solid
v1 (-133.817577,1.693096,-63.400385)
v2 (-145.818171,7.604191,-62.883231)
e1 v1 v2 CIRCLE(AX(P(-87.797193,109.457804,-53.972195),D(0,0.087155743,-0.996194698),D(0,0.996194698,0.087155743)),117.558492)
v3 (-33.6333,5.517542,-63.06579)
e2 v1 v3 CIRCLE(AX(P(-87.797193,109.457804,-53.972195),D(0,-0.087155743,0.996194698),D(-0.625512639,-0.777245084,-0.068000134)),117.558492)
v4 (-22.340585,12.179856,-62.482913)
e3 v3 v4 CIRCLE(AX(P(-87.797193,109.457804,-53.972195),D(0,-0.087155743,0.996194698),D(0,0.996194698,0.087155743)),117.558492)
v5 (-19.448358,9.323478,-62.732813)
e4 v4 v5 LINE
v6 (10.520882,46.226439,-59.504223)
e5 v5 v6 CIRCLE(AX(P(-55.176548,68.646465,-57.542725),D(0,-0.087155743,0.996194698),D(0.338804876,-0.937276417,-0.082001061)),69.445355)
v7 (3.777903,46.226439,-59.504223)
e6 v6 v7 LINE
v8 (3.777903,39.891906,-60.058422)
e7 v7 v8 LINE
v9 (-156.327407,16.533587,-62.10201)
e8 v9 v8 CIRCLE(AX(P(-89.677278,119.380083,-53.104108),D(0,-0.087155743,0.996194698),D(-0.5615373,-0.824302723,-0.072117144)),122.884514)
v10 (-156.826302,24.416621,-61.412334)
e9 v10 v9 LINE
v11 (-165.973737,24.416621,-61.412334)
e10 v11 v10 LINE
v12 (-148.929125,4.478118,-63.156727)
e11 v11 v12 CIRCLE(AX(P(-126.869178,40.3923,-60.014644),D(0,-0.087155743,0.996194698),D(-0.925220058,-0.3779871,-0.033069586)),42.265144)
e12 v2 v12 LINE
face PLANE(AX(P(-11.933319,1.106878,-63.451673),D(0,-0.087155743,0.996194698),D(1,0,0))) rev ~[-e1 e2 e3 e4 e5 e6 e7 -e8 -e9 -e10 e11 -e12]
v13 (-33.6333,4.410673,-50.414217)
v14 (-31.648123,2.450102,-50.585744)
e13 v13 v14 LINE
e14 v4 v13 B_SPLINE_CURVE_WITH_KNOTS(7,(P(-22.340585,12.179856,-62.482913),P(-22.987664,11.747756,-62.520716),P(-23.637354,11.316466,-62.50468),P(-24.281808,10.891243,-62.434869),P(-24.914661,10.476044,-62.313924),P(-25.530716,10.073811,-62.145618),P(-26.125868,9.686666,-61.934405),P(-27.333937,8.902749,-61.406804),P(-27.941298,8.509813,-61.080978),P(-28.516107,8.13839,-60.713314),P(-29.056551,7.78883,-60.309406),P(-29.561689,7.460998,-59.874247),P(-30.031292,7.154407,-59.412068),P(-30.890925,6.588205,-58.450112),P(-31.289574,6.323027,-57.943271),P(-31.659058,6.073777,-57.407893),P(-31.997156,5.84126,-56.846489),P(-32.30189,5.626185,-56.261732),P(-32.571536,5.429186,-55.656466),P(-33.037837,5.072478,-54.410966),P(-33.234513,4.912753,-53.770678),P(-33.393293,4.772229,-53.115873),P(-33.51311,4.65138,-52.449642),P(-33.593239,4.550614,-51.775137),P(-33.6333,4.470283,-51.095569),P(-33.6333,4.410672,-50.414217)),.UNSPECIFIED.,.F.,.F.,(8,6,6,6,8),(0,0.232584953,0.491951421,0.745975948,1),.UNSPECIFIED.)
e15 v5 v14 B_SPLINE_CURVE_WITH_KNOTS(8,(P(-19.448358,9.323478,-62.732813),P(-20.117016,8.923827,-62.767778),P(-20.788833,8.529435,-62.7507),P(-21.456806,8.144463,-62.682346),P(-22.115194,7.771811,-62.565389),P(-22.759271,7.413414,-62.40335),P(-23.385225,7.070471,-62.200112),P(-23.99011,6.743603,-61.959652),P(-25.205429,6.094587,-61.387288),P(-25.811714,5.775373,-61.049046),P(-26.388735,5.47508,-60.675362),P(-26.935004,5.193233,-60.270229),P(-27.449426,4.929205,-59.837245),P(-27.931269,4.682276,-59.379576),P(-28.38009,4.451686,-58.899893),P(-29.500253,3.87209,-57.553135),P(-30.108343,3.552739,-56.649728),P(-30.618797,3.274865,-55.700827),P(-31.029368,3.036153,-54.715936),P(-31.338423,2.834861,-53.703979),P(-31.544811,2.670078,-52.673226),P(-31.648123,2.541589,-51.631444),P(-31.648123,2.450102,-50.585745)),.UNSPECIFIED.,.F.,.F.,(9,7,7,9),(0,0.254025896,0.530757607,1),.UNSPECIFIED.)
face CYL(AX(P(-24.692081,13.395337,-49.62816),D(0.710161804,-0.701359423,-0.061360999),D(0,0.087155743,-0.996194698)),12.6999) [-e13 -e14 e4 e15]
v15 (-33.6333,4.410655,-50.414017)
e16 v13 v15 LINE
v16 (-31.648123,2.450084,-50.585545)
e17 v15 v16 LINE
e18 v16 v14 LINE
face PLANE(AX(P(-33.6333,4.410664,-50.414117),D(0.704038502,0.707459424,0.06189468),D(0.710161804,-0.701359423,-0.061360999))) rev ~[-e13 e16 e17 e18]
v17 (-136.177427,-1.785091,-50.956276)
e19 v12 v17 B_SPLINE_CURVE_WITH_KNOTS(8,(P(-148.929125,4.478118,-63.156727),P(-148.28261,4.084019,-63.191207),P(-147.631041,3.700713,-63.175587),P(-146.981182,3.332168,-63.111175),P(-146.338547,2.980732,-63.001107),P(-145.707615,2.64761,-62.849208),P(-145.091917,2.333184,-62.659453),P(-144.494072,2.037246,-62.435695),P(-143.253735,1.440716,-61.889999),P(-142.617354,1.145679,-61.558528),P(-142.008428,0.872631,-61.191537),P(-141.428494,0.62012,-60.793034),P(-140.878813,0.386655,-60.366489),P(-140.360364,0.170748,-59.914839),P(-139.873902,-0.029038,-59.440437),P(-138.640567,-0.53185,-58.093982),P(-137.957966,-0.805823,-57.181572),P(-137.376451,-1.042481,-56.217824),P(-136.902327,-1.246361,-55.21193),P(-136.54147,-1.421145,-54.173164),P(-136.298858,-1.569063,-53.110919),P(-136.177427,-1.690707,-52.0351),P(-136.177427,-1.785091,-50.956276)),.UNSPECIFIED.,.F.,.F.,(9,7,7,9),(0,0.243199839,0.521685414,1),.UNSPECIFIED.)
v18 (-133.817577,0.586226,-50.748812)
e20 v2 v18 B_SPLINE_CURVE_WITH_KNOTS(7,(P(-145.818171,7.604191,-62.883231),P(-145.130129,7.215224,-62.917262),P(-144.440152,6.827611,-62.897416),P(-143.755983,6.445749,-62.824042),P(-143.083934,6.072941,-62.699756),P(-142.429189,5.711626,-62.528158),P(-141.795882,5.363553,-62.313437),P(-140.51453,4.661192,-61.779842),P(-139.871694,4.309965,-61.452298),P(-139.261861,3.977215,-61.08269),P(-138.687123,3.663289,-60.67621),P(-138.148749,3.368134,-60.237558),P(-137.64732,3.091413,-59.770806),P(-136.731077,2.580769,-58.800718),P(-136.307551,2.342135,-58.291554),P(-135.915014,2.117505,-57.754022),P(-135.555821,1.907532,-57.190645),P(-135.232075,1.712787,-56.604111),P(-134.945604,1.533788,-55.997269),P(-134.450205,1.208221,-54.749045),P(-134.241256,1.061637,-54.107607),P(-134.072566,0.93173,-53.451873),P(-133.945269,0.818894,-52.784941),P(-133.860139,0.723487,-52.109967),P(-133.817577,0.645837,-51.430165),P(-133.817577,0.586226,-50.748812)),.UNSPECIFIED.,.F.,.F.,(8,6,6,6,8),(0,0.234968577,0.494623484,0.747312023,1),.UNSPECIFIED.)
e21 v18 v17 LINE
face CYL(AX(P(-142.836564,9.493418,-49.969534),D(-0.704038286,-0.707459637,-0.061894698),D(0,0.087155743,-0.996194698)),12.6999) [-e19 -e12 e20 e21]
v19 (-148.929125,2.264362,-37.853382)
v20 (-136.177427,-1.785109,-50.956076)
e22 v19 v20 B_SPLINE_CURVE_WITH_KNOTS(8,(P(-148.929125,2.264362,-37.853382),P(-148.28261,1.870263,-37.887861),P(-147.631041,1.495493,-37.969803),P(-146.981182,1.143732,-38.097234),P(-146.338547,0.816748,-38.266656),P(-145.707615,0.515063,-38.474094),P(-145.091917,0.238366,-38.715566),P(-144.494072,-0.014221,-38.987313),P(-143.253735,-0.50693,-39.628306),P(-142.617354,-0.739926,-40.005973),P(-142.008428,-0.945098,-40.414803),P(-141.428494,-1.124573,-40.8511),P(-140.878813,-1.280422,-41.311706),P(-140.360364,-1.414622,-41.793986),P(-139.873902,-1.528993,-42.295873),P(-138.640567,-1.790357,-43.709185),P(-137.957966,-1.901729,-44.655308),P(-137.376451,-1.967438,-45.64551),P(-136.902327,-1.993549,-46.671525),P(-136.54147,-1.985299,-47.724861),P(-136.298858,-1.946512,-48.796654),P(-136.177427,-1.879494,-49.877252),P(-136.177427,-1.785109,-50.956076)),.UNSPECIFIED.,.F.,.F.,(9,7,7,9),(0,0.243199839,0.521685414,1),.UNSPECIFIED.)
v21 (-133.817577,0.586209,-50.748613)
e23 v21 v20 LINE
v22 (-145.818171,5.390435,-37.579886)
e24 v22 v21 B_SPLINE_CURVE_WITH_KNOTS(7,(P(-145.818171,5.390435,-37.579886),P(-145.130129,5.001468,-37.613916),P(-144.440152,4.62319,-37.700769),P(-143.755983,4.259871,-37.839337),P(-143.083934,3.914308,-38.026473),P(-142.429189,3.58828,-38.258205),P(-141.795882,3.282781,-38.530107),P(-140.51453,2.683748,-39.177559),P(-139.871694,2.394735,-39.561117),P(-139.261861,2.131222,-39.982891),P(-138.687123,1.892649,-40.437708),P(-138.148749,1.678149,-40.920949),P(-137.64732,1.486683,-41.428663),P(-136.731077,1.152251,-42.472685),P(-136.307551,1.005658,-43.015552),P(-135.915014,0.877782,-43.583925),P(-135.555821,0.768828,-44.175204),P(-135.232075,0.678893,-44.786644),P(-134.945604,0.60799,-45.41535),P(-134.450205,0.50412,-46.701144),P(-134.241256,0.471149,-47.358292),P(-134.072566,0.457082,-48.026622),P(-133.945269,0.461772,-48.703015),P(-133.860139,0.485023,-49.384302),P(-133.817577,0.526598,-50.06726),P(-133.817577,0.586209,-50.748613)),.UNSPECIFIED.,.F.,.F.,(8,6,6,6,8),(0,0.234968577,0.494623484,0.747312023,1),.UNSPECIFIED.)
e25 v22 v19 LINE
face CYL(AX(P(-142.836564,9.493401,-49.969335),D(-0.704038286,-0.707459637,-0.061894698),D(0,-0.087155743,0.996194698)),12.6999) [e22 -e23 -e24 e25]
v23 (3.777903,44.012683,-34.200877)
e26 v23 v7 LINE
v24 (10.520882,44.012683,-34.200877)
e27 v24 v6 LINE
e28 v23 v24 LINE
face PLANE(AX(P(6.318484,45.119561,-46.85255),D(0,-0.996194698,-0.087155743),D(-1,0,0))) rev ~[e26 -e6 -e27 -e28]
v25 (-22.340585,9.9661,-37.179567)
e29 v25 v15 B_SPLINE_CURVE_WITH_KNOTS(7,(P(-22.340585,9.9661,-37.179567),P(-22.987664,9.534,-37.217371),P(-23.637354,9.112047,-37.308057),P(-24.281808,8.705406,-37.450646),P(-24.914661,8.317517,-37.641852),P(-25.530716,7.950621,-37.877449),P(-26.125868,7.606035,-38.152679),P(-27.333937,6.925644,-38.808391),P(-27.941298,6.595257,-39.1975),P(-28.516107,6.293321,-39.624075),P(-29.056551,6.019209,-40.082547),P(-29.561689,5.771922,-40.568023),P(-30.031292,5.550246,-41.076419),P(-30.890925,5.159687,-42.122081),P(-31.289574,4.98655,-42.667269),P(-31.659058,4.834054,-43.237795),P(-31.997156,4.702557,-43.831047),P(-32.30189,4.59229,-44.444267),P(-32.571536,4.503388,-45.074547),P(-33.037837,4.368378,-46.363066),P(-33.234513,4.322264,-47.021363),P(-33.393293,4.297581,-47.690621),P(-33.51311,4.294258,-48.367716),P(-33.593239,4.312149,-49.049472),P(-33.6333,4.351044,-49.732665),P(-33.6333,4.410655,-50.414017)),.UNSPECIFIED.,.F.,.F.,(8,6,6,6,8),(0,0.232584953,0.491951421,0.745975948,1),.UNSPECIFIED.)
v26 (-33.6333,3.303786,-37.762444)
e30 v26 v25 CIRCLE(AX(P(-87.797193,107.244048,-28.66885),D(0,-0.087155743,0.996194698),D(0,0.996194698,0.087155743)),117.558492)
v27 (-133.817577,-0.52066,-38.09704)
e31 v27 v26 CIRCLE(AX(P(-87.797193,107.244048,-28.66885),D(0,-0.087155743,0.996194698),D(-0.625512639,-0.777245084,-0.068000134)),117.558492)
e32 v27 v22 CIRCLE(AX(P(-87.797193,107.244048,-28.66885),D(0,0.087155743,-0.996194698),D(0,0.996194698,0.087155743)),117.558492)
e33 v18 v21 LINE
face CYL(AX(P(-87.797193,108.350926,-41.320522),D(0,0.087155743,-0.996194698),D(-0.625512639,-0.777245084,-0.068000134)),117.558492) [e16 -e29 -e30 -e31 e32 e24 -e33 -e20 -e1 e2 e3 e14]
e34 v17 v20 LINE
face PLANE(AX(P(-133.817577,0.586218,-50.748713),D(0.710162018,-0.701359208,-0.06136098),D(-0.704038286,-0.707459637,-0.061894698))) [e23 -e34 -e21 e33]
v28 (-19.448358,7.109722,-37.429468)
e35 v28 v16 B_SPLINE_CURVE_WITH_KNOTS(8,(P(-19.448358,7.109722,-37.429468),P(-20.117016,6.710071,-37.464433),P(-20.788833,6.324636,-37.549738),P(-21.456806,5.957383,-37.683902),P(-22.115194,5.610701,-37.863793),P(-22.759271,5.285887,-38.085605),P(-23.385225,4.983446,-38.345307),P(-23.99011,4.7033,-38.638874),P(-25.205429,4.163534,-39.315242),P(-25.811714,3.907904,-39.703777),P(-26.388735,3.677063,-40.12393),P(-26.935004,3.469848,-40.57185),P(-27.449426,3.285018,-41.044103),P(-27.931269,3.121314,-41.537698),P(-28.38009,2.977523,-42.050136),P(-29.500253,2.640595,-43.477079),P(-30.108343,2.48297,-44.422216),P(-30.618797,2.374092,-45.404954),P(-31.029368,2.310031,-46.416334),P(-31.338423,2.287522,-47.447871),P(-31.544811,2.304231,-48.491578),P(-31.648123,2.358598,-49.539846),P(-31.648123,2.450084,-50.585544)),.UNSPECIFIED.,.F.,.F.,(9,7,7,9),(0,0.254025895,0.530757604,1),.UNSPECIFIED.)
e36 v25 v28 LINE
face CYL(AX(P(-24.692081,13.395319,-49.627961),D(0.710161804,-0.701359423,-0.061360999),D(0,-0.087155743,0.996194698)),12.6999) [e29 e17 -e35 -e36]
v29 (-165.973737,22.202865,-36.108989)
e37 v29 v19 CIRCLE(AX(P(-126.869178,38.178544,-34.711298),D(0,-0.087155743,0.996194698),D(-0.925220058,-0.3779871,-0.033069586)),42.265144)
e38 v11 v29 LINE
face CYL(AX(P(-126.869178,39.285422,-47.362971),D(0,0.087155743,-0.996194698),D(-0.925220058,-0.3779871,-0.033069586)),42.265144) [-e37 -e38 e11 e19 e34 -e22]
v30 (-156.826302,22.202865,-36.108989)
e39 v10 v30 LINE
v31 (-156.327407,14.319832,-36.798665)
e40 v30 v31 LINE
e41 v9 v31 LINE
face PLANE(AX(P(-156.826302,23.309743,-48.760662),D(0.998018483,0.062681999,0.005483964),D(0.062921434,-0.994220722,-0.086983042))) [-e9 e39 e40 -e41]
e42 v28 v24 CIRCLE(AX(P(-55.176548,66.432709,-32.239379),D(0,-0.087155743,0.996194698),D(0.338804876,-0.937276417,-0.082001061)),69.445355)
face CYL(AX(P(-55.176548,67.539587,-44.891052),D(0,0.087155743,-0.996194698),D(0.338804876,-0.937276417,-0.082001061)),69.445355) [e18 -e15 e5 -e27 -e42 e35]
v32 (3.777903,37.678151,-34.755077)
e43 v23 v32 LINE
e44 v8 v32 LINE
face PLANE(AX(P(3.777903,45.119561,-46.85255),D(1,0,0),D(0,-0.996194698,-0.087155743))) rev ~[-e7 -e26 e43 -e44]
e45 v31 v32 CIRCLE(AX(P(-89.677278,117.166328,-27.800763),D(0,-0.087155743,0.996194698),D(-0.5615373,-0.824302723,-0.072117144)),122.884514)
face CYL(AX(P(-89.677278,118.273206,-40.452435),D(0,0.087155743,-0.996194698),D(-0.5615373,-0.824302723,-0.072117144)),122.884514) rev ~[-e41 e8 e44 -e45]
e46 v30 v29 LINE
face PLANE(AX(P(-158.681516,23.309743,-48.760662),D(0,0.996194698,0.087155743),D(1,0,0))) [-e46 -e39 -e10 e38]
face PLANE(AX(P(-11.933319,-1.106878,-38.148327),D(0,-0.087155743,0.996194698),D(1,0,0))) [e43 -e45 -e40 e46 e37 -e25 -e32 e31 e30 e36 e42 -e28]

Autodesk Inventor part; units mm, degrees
ref_plane "YZ Plane" through (0, 0, 0) normal (1, 0, 0) x (0, 1, 0)
ref_plane "XZ Plane" through (0, 0, 0) normal (0, 1, 0) x (-1, 0, 0)
ref_plane "Work Plane1" through (0, 0, -50.8) normal (0, 0, 1) x (1, 0, 0)
sketch "Sketch1" plane through (0, 0, -50.8) normal (0, 0, 1) x (1, 0, 0)
  line L0 (-11.933319, 0) -> (16.362179, 0)
  point P0 (0, 0)
ref_plane "Work Plane2" through (-11.933319, 0, -50.8) normal (0, -0.0871557, 0.9961947) x (1, 0, 0)
sketch "Sketch2" plane through (-11.933319, 0, -50.8) normal (0, -0.0871557, 0.9961947) x (1, 0, 0)
  line L0 (20.901803, 66.92299) -> (20.901803, 43.564038)
  line L1 (18.251803, 42.008516) -> (18.251803, 68.335864)
  line L2 (18.251803, 42.008516) -> (20.901803, 42.008516)
  line L3 (-146.748197, 17.044024) -> (-146.748197, 40.704766)
  line L4 (-149.398197, 17.044024) -> (-149.398197, 40.704766)
  line L5 (-149.398197, 42.001169) -> (-149.398197, 42.510921)
  line L6 (-146.748197, 17.044024) -> (-149.398197, 17.044024)
  arc A0 (-146.748197, 17.044024) -> (18.251803, 42.008516) centre (-77.743959, 118.72499) ccw
  arc A1 (-149.398197, 17.044024) -> (20.901803, 42.008516) centre (-75.863874, 108.764811) ccw
  line L7 (-121.884258, 0.588457) -> (-124.244108, -1.791919)
  arc A2 (-154.040418, 23.398782) -> (-124.244108, -1.791919) centre (-114.93586, 39.435485) ccw
  line L8 (-154.040418, 23.398782) -> (-144.892983, 23.398782)
  line L9 (-144.892983, 23.398782) -> (-144.394088, 15.485637)
  line L10 (-21.699981, 4.427512) -> (-19.714804, 2.459452)
  arc A3 (-19.714804, 2.459452) -> (22.454201, 45.29191) centre (-43.243229, 67.797577) ccw
  line L11 (22.454201, 45.29191) -> (15.711222, 45.29191)
  line L12 (15.711222, 45.29191) -> (15.711222, 38.933181)
  point P0 (11.933319, 4.427512)
extrude "Extrusion1" add sketch "Sketch2" along normal mid plane 25.4
fillet "Fillet1" radius 12.7 4 edges at (-32.6407, 2.3235, -37.8482) (-32.6407, 4.5373, -63.1516) (-134.9975, -1.7063, -38.2008) (-134.9975, 0.5074, -63.5041)
properties part number "thigh_strap_02"
